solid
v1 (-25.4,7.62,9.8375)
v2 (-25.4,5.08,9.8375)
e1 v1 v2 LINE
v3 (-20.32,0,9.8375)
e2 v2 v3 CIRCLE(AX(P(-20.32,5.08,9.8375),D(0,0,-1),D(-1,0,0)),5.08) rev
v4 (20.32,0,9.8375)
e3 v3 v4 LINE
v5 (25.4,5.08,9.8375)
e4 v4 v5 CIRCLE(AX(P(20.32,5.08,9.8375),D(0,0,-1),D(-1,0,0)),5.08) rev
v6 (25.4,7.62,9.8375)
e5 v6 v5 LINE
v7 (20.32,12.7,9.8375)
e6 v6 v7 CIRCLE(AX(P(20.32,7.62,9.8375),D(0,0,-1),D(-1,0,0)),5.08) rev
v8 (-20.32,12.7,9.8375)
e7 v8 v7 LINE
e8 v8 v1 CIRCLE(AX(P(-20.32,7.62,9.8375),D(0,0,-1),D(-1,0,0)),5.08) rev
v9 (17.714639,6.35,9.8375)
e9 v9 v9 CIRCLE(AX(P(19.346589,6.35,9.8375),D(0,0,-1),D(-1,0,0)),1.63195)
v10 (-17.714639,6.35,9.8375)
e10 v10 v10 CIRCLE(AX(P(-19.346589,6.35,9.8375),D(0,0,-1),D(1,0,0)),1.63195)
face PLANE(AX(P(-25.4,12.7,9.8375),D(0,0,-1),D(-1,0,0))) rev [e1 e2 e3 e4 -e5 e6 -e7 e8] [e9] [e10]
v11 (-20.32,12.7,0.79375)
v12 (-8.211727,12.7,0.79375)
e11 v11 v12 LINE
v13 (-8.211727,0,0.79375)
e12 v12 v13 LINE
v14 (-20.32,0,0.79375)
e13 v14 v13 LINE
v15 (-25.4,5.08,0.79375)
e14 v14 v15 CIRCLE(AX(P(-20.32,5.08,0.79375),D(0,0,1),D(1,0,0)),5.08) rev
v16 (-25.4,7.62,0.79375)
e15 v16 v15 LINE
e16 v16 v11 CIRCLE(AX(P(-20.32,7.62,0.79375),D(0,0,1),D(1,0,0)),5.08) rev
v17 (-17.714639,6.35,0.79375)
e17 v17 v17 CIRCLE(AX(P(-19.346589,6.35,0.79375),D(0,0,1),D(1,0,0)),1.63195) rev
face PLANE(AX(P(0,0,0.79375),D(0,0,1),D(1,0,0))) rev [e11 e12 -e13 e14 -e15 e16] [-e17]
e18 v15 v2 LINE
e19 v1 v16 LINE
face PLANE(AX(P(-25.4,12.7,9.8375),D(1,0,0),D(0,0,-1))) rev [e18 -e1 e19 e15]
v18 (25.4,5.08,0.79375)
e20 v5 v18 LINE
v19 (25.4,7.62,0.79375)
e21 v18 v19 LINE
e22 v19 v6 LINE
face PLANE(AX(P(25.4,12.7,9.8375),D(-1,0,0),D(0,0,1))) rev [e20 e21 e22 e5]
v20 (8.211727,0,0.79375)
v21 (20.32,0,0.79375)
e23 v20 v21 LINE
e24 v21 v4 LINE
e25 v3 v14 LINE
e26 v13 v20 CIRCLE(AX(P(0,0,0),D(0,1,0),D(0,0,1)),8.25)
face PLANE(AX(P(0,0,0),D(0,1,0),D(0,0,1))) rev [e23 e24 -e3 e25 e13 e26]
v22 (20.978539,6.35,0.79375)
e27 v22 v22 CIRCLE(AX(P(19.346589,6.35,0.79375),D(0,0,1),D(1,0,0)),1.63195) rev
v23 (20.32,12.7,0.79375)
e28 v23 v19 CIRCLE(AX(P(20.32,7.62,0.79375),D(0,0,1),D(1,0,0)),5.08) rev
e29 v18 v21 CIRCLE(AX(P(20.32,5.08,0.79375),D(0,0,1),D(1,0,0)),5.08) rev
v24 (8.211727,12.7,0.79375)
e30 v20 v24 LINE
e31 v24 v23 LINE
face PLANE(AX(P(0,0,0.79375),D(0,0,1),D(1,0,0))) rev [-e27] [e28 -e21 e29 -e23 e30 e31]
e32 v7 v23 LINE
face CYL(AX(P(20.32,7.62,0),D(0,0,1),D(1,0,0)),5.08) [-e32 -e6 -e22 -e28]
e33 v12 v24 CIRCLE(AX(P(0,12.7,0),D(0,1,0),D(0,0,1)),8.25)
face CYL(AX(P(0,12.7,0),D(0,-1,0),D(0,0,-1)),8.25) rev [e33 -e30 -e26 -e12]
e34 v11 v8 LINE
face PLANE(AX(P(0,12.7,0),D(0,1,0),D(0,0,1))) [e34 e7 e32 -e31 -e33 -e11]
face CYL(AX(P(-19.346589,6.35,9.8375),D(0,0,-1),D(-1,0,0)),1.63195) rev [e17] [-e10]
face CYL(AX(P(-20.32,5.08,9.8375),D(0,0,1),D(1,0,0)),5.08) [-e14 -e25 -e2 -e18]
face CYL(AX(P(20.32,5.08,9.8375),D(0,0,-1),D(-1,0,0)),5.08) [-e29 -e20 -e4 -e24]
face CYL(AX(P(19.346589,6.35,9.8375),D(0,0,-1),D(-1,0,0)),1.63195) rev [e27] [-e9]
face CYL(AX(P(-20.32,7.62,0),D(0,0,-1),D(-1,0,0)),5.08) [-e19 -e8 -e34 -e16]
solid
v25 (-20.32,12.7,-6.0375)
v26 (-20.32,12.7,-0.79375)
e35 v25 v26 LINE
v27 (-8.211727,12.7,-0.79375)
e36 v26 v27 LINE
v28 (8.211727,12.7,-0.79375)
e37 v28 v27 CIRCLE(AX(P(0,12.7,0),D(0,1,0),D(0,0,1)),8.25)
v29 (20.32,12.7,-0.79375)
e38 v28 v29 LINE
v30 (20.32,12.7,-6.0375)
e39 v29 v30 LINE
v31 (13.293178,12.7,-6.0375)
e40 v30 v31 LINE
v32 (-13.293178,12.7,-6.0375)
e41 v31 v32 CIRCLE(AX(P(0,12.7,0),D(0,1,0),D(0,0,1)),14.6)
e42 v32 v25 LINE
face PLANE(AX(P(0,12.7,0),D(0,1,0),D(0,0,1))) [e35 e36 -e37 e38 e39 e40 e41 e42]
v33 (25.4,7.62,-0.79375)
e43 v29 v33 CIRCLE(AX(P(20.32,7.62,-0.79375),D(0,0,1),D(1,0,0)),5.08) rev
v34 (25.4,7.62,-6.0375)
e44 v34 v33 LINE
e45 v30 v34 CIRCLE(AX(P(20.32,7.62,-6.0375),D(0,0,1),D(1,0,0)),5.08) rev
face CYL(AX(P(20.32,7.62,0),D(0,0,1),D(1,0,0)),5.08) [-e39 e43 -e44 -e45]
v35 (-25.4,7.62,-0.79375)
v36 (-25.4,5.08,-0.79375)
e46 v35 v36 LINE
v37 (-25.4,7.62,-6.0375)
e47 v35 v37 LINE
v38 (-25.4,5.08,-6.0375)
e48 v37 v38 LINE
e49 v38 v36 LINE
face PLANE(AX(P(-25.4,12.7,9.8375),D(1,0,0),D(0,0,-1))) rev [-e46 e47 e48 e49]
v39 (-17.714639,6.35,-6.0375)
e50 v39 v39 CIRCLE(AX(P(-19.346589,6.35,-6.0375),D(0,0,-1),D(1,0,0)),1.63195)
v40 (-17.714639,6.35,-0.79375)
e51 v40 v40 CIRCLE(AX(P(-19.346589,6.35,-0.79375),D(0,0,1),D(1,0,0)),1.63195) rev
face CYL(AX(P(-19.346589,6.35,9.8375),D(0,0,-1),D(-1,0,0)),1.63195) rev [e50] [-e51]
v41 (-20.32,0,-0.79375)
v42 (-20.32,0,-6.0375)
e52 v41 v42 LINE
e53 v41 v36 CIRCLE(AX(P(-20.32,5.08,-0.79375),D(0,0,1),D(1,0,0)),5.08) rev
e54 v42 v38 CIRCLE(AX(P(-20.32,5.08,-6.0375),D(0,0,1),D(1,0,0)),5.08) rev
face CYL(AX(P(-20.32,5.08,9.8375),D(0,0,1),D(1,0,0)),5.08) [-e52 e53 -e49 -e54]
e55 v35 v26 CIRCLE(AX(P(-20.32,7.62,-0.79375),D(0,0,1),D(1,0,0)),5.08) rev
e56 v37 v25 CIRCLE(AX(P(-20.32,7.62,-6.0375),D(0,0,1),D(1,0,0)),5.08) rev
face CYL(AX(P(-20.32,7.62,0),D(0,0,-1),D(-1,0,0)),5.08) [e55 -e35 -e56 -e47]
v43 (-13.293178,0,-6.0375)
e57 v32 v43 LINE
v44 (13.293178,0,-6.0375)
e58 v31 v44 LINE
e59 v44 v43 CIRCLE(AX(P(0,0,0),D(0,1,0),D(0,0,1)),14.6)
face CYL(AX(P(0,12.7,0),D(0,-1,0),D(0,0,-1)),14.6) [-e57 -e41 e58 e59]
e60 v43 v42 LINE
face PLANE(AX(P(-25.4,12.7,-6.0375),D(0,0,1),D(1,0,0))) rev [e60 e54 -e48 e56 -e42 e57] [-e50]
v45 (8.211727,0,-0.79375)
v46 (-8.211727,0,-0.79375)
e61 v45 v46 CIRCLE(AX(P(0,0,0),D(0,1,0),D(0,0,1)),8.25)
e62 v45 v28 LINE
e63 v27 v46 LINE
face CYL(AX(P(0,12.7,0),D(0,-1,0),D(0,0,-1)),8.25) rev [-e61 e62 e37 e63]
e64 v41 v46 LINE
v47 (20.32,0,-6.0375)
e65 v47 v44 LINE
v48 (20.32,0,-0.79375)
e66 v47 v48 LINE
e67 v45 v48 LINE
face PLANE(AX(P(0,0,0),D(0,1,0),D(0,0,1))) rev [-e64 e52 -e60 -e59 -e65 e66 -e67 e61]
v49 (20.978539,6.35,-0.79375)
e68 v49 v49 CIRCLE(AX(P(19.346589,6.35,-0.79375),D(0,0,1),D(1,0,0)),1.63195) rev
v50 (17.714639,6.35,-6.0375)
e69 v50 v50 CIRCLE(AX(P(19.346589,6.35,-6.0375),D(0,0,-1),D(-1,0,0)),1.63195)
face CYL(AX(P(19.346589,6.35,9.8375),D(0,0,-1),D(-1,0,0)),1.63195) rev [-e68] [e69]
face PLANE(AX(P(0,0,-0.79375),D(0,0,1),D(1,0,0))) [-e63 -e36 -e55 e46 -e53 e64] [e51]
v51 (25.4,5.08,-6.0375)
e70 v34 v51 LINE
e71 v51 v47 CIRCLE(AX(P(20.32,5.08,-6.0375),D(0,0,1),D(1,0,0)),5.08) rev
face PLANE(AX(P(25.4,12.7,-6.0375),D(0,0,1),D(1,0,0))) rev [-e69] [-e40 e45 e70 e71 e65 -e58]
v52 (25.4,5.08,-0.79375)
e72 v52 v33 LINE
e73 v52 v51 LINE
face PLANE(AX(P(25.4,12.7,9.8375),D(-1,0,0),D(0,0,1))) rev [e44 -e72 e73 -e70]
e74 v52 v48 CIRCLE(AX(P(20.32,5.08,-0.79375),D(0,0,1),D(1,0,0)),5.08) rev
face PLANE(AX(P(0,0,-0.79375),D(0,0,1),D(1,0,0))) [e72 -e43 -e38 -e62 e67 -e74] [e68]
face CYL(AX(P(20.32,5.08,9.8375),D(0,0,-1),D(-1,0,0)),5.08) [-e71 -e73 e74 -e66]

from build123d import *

# Parameters (mm, degrees)
SKETCH1_R           = 8.25
BOSS_EXTRUDE1_DEPTH = 12.7
SKETCH6_R           = 1.63195
CUT_EXTRUDE1_DEPTH  = 33.534068682
FILLET1_R           = 5.08
SPLIT2_START        = -14.6
SPLIT2_OUTLINE_R    = 1.63195
SPLIT2_DEPTH        = 13.80625
SPLIT2_2_DEPTH      = 12.7
SPLIT2_START_2      = -16
SPLIT2_3_OUTLINE_R  = 1.63195
SPLIT2_3_DEPTH      = 16.79375
SPLIT2_4_DEPTH      = 12.7
SPLIT2_START_3      = -0.79375
SPLIT2_5_OUTLINE_R  = 1.63195
SPLIT2_5_DEPTH      = 1.5875
SPLIT2_6_DEPTH      = 12.7
SPLIT2_7_OUTLINE_R  = 1.63195
SPLIT2_7_DEPTH      = 1.5875


with BuildPart() as part:
    # Sketch1 → Boss-Extrude1 (new body)
    with BuildSketch(Plane(origin=(0, 0, 0), x_dir=(1, 0, 0), z_dir=(0, 1, 0))):
        with BuildLine():
            Line((-25.4, -9.8375), (25.4, -9.8375))
            Line((25.4, -9.8375), (25.4, 6.0375))
            Line((25.4, 6.0375), (13.293178467, 6.0375))
            ThreePointArc((13.293178467, 6.0375), (0, 14.6), (-13.293178467, 6.0375))
            Line((-13.293178467, 6.0375), (-25.4, 6.0375))
            Line((-25.4, 6.0375), (-25.4, -9.8375))
        make_face()
        with Locations(Location((0, 0, 0), (0, 0, 270))):
            Circle(SKETCH1_R, mode=Mode.SUBTRACT)
    extrude(amount=BOSS_EXTRUDE1_DEPTH)

    # Sketch6 → Cut-Extrude1 (cut, through all)
    with BuildSketch(Plane(origin=(0, 0, -6.0375), x_dir=(-1, 0, 0), z_dir=(0, 0, -1))):
        with Locations((-19.346589233, 6.35)):
            Circle(SKETCH6_R)
        with Locations(Location((19.346589233, 6.35, 0), (0, 0, 180))):
            Circle(SKETCH6_R)
    extrude(amount=-CUT_EXTRUDE1_DEPTH, mode=Mode.SUBTRACT)

    # Fillet1
    fillet1_edges = [part.edges().sort_by_distance(p)[0] for p in [
        (-25.4, 12.7, 1.9),
        (25.4, 12.7, 1.9),
        (-25.4, 0, 1.9),
        (25.4, 0, 1.9),
    ]]
    fillet(fillet1_edges, radius=FILLET1_R)

    # Split2 3 outline → Split2 3 (cut)
    with BuildSketch(Plane.XY.offset(SPLIT2_START_2)):
        with BuildLine():
            ThreePointArc((25.4, 7.62), (23.912102448, 11.212102448), (20.32, 12.7))
            Line((20.32, 12.7), (-20.32, 12.7))
            ThreePointArc((-20.32, 12.7), (-23.912102448, 11.212102448), (-25.4, 7.62))
            Line((-25.4, 7.62), (-25.4, 5.08))
            ThreePointArc((-25.4, 5.08), (-23.912102448, 1.487897552), (-20.32, 0))
            Line((-20.32, 0), (20.32, 0))
            ThreePointArc((20.32, 0), (23.912102448, 1.487897552), (25.4, 5.08))
            Line((25.4, 5.08), (25.4, 7.62))
        make_face()
        with Locations((-19.346589233, 6.35)):
            Circle(SPLIT2_3_OUTLINE_R, mode=Mode.SUBTRACT)
        with Locations((19.346589233, 6.35)):
            Circle(SPLIT2_3_OUTLINE_R, mode=Mode.SUBTRACT)
    extrude(amount=SPLIT2_3_DEPTH, mode=Mode.SUBTRACT)


with BuildPart() as body_2:
    # Split2: read off the stored shape, not the designer's step
    # Split2 outline → Split2 (new body)
    with BuildSketch(Plane.XY.offset(SPLIT2_START)):
        with BuildLine():
            Line((-20.32, 0), (20.32, 0))
            ThreePointArc((20.32, 0), (23.912102448, 1.487897552), (25.4, 5.08))
            Line((25.4, 5.08), (25.4, 7.62))
            ThreePointArc((25.4, 7.62), (23.912102448, 11.212102448), (20.32, 12.7))
            Line((20.32, 12.7), (-20.32, 12.7))
            ThreePointArc((-20.32, 12.7), (-23.912102448, 11.212102448), (-25.4, 7.62))
            Line((-25.4, 7.62), (-25.4, 5.08))
            ThreePointArc((-25.4, 5.08), (-23.912102448, 1.487897552), (-20.32, 0))
        make_face()
        with Locations((-19.346589233, 6.35)):
            Circle(SPLIT2_OUTLINE_R, mode=Mode.SUBTRACT)
        with Locations((19.346589233, 6.35)):
            Circle(SPLIT2_OUTLINE_R, mode=Mode.SUBTRACT)
    extrude(amount=SPLIT2_DEPTH)

    # Split2 2 outline → Split2 2 (cut)
    with BuildSketch(Plane(origin=(0, 0, 0), x_dir=(1, 0, 0), z_dir=(0, 1, 0))):
        with BuildLine():
            Line((-25.4, 6.0375), (-13.293178467, 6.0375))
            ThreePointArc((-13.293178467, 6.0375), (-7.906089425, 12.274108929), (0, 14.6))
            Line((0, 14.6), (-25.4, 14.6))
            Line((-25.4, 14.6), (-25.4, 6.0375))
        make_face()
        with BuildLine():
            Line((25.4, 14.6), (0, 14.6))
            ThreePointArc((0, 14.6), (7.906089425, 12.274108929), (13.293178467, 6.0375))
            Line((13.293178467, 6.0375), (25.4, 6.0375))
            Line((25.4, 6.0375), (25.4, 14.6))
        make_face()
        with BuildLine():
            ThreePointArc((8.211727037, 0.79375), (0, 8.25), (-8.211727037, 0.79375))
            Line((-8.211727037, 0.79375), (8.211727037, 0.79375))
        make_face()
    extrude(amount=SPLIT2_2_DEPTH, mode=Mode.SUBTRACT)


with BuildPart() as body_3:
    # Split2 4 outline → Split2 4 (new body)
    with BuildSketch(Plane(origin=(0, 0, 0), x_dir=(1, 0, 0), z_dir=(0, 1, 0))):
        with BuildLine():
            Line((25.4, 0.79375), (8.211727037, 0.79375))
            ThreePointArc((8.211727037, 0.79375), (8.25, 0), (8.211727037, -0.79375))
            Line((8.211727037, -0.79375), (25.4, -0.79375))
            Line((25.4, -0.79375), (25.4, 0.79375))
        make_face()
    extrude(amount=SPLIT2_4_DEPTH)

    # Split2 5 outline → Split2 5 (cut)
    with BuildSketch(Plane.XY.offset(SPLIT2_START_3)):
        with BuildLine():
            ThreePointArc((20.32, 12.7), (23.912102448, 11.212102448), (25.4, 7.62))
            Line((25.4, 7.62), (25.4, 12.7))
            Line((25.4, 12.7), (20.32, 12.7))
        make_face()
        with BuildLine():
            Line((25.4, 0), (25.4, 5.08))
            ThreePointArc((25.4, 5.08), (23.912102448, 1.487897552), (20.32, 0))
            Line((20.32, 0), (25.4, 0))
        make_face()
        with Locations((19.346589233, 6.35)):
            Circle(SPLIT2_5_OUTLINE_R)
    extrude(amount=SPLIT2_5_DEPTH, mode=Mode.SUBTRACT)


with BuildPart() as body_4:
    # Split2 6 outline → Split2 6 (new body)
    with BuildSketch(Plane(origin=(0, 0, 0), x_dir=(1, 0, 0), z_dir=(0, 1, 0))):
        with BuildLine():
            Line((-8.211727037, 0.79375), (-25.4, 0.79375))
            Line((-25.4, 0.79375), (-25.4, -0.79375))
            Line((-25.4, -0.79375), (-8.211727037, -0.79375))
            ThreePointArc((-8.211727037, -0.79375), (-8.25, 0), (-8.211727037, 0.79375))
        make_face()
    extrude(amount=SPLIT2_6_DEPTH)

    # Split2 7 outline → Split2 7 (cut)
    with BuildSketch(Plane.XY.offset(SPLIT2_START_3)):
        with BuildLine():
            Line((-25.4, 12.7), (-25.4, 7.62))
            ThreePointArc((-25.4, 7.62), (-23.912102448, 11.212102448), (-20.32, 12.7))
            Line((-20.32, 12.7), (-25.4, 12.7))
        make_face()
        with BuildLine():
            ThreePointArc((-20.32, 0), (-23.912102448, 1.487897552), (-25.4, 5.08))
            Line((-25.4, 5.08), (-25.4, 0))
            Line((-25.4, 0), (-20.32, 0))
        make_face()
        with Locations((-19.346589233, 6.35)):
            Circle(SPLIT2_7_OUTLINE_R)
    extrude(amount=SPLIT2_7_DEPTH, mode=Mode.SUBTRACT)


solid = Compound([part.part, body_2.part])
